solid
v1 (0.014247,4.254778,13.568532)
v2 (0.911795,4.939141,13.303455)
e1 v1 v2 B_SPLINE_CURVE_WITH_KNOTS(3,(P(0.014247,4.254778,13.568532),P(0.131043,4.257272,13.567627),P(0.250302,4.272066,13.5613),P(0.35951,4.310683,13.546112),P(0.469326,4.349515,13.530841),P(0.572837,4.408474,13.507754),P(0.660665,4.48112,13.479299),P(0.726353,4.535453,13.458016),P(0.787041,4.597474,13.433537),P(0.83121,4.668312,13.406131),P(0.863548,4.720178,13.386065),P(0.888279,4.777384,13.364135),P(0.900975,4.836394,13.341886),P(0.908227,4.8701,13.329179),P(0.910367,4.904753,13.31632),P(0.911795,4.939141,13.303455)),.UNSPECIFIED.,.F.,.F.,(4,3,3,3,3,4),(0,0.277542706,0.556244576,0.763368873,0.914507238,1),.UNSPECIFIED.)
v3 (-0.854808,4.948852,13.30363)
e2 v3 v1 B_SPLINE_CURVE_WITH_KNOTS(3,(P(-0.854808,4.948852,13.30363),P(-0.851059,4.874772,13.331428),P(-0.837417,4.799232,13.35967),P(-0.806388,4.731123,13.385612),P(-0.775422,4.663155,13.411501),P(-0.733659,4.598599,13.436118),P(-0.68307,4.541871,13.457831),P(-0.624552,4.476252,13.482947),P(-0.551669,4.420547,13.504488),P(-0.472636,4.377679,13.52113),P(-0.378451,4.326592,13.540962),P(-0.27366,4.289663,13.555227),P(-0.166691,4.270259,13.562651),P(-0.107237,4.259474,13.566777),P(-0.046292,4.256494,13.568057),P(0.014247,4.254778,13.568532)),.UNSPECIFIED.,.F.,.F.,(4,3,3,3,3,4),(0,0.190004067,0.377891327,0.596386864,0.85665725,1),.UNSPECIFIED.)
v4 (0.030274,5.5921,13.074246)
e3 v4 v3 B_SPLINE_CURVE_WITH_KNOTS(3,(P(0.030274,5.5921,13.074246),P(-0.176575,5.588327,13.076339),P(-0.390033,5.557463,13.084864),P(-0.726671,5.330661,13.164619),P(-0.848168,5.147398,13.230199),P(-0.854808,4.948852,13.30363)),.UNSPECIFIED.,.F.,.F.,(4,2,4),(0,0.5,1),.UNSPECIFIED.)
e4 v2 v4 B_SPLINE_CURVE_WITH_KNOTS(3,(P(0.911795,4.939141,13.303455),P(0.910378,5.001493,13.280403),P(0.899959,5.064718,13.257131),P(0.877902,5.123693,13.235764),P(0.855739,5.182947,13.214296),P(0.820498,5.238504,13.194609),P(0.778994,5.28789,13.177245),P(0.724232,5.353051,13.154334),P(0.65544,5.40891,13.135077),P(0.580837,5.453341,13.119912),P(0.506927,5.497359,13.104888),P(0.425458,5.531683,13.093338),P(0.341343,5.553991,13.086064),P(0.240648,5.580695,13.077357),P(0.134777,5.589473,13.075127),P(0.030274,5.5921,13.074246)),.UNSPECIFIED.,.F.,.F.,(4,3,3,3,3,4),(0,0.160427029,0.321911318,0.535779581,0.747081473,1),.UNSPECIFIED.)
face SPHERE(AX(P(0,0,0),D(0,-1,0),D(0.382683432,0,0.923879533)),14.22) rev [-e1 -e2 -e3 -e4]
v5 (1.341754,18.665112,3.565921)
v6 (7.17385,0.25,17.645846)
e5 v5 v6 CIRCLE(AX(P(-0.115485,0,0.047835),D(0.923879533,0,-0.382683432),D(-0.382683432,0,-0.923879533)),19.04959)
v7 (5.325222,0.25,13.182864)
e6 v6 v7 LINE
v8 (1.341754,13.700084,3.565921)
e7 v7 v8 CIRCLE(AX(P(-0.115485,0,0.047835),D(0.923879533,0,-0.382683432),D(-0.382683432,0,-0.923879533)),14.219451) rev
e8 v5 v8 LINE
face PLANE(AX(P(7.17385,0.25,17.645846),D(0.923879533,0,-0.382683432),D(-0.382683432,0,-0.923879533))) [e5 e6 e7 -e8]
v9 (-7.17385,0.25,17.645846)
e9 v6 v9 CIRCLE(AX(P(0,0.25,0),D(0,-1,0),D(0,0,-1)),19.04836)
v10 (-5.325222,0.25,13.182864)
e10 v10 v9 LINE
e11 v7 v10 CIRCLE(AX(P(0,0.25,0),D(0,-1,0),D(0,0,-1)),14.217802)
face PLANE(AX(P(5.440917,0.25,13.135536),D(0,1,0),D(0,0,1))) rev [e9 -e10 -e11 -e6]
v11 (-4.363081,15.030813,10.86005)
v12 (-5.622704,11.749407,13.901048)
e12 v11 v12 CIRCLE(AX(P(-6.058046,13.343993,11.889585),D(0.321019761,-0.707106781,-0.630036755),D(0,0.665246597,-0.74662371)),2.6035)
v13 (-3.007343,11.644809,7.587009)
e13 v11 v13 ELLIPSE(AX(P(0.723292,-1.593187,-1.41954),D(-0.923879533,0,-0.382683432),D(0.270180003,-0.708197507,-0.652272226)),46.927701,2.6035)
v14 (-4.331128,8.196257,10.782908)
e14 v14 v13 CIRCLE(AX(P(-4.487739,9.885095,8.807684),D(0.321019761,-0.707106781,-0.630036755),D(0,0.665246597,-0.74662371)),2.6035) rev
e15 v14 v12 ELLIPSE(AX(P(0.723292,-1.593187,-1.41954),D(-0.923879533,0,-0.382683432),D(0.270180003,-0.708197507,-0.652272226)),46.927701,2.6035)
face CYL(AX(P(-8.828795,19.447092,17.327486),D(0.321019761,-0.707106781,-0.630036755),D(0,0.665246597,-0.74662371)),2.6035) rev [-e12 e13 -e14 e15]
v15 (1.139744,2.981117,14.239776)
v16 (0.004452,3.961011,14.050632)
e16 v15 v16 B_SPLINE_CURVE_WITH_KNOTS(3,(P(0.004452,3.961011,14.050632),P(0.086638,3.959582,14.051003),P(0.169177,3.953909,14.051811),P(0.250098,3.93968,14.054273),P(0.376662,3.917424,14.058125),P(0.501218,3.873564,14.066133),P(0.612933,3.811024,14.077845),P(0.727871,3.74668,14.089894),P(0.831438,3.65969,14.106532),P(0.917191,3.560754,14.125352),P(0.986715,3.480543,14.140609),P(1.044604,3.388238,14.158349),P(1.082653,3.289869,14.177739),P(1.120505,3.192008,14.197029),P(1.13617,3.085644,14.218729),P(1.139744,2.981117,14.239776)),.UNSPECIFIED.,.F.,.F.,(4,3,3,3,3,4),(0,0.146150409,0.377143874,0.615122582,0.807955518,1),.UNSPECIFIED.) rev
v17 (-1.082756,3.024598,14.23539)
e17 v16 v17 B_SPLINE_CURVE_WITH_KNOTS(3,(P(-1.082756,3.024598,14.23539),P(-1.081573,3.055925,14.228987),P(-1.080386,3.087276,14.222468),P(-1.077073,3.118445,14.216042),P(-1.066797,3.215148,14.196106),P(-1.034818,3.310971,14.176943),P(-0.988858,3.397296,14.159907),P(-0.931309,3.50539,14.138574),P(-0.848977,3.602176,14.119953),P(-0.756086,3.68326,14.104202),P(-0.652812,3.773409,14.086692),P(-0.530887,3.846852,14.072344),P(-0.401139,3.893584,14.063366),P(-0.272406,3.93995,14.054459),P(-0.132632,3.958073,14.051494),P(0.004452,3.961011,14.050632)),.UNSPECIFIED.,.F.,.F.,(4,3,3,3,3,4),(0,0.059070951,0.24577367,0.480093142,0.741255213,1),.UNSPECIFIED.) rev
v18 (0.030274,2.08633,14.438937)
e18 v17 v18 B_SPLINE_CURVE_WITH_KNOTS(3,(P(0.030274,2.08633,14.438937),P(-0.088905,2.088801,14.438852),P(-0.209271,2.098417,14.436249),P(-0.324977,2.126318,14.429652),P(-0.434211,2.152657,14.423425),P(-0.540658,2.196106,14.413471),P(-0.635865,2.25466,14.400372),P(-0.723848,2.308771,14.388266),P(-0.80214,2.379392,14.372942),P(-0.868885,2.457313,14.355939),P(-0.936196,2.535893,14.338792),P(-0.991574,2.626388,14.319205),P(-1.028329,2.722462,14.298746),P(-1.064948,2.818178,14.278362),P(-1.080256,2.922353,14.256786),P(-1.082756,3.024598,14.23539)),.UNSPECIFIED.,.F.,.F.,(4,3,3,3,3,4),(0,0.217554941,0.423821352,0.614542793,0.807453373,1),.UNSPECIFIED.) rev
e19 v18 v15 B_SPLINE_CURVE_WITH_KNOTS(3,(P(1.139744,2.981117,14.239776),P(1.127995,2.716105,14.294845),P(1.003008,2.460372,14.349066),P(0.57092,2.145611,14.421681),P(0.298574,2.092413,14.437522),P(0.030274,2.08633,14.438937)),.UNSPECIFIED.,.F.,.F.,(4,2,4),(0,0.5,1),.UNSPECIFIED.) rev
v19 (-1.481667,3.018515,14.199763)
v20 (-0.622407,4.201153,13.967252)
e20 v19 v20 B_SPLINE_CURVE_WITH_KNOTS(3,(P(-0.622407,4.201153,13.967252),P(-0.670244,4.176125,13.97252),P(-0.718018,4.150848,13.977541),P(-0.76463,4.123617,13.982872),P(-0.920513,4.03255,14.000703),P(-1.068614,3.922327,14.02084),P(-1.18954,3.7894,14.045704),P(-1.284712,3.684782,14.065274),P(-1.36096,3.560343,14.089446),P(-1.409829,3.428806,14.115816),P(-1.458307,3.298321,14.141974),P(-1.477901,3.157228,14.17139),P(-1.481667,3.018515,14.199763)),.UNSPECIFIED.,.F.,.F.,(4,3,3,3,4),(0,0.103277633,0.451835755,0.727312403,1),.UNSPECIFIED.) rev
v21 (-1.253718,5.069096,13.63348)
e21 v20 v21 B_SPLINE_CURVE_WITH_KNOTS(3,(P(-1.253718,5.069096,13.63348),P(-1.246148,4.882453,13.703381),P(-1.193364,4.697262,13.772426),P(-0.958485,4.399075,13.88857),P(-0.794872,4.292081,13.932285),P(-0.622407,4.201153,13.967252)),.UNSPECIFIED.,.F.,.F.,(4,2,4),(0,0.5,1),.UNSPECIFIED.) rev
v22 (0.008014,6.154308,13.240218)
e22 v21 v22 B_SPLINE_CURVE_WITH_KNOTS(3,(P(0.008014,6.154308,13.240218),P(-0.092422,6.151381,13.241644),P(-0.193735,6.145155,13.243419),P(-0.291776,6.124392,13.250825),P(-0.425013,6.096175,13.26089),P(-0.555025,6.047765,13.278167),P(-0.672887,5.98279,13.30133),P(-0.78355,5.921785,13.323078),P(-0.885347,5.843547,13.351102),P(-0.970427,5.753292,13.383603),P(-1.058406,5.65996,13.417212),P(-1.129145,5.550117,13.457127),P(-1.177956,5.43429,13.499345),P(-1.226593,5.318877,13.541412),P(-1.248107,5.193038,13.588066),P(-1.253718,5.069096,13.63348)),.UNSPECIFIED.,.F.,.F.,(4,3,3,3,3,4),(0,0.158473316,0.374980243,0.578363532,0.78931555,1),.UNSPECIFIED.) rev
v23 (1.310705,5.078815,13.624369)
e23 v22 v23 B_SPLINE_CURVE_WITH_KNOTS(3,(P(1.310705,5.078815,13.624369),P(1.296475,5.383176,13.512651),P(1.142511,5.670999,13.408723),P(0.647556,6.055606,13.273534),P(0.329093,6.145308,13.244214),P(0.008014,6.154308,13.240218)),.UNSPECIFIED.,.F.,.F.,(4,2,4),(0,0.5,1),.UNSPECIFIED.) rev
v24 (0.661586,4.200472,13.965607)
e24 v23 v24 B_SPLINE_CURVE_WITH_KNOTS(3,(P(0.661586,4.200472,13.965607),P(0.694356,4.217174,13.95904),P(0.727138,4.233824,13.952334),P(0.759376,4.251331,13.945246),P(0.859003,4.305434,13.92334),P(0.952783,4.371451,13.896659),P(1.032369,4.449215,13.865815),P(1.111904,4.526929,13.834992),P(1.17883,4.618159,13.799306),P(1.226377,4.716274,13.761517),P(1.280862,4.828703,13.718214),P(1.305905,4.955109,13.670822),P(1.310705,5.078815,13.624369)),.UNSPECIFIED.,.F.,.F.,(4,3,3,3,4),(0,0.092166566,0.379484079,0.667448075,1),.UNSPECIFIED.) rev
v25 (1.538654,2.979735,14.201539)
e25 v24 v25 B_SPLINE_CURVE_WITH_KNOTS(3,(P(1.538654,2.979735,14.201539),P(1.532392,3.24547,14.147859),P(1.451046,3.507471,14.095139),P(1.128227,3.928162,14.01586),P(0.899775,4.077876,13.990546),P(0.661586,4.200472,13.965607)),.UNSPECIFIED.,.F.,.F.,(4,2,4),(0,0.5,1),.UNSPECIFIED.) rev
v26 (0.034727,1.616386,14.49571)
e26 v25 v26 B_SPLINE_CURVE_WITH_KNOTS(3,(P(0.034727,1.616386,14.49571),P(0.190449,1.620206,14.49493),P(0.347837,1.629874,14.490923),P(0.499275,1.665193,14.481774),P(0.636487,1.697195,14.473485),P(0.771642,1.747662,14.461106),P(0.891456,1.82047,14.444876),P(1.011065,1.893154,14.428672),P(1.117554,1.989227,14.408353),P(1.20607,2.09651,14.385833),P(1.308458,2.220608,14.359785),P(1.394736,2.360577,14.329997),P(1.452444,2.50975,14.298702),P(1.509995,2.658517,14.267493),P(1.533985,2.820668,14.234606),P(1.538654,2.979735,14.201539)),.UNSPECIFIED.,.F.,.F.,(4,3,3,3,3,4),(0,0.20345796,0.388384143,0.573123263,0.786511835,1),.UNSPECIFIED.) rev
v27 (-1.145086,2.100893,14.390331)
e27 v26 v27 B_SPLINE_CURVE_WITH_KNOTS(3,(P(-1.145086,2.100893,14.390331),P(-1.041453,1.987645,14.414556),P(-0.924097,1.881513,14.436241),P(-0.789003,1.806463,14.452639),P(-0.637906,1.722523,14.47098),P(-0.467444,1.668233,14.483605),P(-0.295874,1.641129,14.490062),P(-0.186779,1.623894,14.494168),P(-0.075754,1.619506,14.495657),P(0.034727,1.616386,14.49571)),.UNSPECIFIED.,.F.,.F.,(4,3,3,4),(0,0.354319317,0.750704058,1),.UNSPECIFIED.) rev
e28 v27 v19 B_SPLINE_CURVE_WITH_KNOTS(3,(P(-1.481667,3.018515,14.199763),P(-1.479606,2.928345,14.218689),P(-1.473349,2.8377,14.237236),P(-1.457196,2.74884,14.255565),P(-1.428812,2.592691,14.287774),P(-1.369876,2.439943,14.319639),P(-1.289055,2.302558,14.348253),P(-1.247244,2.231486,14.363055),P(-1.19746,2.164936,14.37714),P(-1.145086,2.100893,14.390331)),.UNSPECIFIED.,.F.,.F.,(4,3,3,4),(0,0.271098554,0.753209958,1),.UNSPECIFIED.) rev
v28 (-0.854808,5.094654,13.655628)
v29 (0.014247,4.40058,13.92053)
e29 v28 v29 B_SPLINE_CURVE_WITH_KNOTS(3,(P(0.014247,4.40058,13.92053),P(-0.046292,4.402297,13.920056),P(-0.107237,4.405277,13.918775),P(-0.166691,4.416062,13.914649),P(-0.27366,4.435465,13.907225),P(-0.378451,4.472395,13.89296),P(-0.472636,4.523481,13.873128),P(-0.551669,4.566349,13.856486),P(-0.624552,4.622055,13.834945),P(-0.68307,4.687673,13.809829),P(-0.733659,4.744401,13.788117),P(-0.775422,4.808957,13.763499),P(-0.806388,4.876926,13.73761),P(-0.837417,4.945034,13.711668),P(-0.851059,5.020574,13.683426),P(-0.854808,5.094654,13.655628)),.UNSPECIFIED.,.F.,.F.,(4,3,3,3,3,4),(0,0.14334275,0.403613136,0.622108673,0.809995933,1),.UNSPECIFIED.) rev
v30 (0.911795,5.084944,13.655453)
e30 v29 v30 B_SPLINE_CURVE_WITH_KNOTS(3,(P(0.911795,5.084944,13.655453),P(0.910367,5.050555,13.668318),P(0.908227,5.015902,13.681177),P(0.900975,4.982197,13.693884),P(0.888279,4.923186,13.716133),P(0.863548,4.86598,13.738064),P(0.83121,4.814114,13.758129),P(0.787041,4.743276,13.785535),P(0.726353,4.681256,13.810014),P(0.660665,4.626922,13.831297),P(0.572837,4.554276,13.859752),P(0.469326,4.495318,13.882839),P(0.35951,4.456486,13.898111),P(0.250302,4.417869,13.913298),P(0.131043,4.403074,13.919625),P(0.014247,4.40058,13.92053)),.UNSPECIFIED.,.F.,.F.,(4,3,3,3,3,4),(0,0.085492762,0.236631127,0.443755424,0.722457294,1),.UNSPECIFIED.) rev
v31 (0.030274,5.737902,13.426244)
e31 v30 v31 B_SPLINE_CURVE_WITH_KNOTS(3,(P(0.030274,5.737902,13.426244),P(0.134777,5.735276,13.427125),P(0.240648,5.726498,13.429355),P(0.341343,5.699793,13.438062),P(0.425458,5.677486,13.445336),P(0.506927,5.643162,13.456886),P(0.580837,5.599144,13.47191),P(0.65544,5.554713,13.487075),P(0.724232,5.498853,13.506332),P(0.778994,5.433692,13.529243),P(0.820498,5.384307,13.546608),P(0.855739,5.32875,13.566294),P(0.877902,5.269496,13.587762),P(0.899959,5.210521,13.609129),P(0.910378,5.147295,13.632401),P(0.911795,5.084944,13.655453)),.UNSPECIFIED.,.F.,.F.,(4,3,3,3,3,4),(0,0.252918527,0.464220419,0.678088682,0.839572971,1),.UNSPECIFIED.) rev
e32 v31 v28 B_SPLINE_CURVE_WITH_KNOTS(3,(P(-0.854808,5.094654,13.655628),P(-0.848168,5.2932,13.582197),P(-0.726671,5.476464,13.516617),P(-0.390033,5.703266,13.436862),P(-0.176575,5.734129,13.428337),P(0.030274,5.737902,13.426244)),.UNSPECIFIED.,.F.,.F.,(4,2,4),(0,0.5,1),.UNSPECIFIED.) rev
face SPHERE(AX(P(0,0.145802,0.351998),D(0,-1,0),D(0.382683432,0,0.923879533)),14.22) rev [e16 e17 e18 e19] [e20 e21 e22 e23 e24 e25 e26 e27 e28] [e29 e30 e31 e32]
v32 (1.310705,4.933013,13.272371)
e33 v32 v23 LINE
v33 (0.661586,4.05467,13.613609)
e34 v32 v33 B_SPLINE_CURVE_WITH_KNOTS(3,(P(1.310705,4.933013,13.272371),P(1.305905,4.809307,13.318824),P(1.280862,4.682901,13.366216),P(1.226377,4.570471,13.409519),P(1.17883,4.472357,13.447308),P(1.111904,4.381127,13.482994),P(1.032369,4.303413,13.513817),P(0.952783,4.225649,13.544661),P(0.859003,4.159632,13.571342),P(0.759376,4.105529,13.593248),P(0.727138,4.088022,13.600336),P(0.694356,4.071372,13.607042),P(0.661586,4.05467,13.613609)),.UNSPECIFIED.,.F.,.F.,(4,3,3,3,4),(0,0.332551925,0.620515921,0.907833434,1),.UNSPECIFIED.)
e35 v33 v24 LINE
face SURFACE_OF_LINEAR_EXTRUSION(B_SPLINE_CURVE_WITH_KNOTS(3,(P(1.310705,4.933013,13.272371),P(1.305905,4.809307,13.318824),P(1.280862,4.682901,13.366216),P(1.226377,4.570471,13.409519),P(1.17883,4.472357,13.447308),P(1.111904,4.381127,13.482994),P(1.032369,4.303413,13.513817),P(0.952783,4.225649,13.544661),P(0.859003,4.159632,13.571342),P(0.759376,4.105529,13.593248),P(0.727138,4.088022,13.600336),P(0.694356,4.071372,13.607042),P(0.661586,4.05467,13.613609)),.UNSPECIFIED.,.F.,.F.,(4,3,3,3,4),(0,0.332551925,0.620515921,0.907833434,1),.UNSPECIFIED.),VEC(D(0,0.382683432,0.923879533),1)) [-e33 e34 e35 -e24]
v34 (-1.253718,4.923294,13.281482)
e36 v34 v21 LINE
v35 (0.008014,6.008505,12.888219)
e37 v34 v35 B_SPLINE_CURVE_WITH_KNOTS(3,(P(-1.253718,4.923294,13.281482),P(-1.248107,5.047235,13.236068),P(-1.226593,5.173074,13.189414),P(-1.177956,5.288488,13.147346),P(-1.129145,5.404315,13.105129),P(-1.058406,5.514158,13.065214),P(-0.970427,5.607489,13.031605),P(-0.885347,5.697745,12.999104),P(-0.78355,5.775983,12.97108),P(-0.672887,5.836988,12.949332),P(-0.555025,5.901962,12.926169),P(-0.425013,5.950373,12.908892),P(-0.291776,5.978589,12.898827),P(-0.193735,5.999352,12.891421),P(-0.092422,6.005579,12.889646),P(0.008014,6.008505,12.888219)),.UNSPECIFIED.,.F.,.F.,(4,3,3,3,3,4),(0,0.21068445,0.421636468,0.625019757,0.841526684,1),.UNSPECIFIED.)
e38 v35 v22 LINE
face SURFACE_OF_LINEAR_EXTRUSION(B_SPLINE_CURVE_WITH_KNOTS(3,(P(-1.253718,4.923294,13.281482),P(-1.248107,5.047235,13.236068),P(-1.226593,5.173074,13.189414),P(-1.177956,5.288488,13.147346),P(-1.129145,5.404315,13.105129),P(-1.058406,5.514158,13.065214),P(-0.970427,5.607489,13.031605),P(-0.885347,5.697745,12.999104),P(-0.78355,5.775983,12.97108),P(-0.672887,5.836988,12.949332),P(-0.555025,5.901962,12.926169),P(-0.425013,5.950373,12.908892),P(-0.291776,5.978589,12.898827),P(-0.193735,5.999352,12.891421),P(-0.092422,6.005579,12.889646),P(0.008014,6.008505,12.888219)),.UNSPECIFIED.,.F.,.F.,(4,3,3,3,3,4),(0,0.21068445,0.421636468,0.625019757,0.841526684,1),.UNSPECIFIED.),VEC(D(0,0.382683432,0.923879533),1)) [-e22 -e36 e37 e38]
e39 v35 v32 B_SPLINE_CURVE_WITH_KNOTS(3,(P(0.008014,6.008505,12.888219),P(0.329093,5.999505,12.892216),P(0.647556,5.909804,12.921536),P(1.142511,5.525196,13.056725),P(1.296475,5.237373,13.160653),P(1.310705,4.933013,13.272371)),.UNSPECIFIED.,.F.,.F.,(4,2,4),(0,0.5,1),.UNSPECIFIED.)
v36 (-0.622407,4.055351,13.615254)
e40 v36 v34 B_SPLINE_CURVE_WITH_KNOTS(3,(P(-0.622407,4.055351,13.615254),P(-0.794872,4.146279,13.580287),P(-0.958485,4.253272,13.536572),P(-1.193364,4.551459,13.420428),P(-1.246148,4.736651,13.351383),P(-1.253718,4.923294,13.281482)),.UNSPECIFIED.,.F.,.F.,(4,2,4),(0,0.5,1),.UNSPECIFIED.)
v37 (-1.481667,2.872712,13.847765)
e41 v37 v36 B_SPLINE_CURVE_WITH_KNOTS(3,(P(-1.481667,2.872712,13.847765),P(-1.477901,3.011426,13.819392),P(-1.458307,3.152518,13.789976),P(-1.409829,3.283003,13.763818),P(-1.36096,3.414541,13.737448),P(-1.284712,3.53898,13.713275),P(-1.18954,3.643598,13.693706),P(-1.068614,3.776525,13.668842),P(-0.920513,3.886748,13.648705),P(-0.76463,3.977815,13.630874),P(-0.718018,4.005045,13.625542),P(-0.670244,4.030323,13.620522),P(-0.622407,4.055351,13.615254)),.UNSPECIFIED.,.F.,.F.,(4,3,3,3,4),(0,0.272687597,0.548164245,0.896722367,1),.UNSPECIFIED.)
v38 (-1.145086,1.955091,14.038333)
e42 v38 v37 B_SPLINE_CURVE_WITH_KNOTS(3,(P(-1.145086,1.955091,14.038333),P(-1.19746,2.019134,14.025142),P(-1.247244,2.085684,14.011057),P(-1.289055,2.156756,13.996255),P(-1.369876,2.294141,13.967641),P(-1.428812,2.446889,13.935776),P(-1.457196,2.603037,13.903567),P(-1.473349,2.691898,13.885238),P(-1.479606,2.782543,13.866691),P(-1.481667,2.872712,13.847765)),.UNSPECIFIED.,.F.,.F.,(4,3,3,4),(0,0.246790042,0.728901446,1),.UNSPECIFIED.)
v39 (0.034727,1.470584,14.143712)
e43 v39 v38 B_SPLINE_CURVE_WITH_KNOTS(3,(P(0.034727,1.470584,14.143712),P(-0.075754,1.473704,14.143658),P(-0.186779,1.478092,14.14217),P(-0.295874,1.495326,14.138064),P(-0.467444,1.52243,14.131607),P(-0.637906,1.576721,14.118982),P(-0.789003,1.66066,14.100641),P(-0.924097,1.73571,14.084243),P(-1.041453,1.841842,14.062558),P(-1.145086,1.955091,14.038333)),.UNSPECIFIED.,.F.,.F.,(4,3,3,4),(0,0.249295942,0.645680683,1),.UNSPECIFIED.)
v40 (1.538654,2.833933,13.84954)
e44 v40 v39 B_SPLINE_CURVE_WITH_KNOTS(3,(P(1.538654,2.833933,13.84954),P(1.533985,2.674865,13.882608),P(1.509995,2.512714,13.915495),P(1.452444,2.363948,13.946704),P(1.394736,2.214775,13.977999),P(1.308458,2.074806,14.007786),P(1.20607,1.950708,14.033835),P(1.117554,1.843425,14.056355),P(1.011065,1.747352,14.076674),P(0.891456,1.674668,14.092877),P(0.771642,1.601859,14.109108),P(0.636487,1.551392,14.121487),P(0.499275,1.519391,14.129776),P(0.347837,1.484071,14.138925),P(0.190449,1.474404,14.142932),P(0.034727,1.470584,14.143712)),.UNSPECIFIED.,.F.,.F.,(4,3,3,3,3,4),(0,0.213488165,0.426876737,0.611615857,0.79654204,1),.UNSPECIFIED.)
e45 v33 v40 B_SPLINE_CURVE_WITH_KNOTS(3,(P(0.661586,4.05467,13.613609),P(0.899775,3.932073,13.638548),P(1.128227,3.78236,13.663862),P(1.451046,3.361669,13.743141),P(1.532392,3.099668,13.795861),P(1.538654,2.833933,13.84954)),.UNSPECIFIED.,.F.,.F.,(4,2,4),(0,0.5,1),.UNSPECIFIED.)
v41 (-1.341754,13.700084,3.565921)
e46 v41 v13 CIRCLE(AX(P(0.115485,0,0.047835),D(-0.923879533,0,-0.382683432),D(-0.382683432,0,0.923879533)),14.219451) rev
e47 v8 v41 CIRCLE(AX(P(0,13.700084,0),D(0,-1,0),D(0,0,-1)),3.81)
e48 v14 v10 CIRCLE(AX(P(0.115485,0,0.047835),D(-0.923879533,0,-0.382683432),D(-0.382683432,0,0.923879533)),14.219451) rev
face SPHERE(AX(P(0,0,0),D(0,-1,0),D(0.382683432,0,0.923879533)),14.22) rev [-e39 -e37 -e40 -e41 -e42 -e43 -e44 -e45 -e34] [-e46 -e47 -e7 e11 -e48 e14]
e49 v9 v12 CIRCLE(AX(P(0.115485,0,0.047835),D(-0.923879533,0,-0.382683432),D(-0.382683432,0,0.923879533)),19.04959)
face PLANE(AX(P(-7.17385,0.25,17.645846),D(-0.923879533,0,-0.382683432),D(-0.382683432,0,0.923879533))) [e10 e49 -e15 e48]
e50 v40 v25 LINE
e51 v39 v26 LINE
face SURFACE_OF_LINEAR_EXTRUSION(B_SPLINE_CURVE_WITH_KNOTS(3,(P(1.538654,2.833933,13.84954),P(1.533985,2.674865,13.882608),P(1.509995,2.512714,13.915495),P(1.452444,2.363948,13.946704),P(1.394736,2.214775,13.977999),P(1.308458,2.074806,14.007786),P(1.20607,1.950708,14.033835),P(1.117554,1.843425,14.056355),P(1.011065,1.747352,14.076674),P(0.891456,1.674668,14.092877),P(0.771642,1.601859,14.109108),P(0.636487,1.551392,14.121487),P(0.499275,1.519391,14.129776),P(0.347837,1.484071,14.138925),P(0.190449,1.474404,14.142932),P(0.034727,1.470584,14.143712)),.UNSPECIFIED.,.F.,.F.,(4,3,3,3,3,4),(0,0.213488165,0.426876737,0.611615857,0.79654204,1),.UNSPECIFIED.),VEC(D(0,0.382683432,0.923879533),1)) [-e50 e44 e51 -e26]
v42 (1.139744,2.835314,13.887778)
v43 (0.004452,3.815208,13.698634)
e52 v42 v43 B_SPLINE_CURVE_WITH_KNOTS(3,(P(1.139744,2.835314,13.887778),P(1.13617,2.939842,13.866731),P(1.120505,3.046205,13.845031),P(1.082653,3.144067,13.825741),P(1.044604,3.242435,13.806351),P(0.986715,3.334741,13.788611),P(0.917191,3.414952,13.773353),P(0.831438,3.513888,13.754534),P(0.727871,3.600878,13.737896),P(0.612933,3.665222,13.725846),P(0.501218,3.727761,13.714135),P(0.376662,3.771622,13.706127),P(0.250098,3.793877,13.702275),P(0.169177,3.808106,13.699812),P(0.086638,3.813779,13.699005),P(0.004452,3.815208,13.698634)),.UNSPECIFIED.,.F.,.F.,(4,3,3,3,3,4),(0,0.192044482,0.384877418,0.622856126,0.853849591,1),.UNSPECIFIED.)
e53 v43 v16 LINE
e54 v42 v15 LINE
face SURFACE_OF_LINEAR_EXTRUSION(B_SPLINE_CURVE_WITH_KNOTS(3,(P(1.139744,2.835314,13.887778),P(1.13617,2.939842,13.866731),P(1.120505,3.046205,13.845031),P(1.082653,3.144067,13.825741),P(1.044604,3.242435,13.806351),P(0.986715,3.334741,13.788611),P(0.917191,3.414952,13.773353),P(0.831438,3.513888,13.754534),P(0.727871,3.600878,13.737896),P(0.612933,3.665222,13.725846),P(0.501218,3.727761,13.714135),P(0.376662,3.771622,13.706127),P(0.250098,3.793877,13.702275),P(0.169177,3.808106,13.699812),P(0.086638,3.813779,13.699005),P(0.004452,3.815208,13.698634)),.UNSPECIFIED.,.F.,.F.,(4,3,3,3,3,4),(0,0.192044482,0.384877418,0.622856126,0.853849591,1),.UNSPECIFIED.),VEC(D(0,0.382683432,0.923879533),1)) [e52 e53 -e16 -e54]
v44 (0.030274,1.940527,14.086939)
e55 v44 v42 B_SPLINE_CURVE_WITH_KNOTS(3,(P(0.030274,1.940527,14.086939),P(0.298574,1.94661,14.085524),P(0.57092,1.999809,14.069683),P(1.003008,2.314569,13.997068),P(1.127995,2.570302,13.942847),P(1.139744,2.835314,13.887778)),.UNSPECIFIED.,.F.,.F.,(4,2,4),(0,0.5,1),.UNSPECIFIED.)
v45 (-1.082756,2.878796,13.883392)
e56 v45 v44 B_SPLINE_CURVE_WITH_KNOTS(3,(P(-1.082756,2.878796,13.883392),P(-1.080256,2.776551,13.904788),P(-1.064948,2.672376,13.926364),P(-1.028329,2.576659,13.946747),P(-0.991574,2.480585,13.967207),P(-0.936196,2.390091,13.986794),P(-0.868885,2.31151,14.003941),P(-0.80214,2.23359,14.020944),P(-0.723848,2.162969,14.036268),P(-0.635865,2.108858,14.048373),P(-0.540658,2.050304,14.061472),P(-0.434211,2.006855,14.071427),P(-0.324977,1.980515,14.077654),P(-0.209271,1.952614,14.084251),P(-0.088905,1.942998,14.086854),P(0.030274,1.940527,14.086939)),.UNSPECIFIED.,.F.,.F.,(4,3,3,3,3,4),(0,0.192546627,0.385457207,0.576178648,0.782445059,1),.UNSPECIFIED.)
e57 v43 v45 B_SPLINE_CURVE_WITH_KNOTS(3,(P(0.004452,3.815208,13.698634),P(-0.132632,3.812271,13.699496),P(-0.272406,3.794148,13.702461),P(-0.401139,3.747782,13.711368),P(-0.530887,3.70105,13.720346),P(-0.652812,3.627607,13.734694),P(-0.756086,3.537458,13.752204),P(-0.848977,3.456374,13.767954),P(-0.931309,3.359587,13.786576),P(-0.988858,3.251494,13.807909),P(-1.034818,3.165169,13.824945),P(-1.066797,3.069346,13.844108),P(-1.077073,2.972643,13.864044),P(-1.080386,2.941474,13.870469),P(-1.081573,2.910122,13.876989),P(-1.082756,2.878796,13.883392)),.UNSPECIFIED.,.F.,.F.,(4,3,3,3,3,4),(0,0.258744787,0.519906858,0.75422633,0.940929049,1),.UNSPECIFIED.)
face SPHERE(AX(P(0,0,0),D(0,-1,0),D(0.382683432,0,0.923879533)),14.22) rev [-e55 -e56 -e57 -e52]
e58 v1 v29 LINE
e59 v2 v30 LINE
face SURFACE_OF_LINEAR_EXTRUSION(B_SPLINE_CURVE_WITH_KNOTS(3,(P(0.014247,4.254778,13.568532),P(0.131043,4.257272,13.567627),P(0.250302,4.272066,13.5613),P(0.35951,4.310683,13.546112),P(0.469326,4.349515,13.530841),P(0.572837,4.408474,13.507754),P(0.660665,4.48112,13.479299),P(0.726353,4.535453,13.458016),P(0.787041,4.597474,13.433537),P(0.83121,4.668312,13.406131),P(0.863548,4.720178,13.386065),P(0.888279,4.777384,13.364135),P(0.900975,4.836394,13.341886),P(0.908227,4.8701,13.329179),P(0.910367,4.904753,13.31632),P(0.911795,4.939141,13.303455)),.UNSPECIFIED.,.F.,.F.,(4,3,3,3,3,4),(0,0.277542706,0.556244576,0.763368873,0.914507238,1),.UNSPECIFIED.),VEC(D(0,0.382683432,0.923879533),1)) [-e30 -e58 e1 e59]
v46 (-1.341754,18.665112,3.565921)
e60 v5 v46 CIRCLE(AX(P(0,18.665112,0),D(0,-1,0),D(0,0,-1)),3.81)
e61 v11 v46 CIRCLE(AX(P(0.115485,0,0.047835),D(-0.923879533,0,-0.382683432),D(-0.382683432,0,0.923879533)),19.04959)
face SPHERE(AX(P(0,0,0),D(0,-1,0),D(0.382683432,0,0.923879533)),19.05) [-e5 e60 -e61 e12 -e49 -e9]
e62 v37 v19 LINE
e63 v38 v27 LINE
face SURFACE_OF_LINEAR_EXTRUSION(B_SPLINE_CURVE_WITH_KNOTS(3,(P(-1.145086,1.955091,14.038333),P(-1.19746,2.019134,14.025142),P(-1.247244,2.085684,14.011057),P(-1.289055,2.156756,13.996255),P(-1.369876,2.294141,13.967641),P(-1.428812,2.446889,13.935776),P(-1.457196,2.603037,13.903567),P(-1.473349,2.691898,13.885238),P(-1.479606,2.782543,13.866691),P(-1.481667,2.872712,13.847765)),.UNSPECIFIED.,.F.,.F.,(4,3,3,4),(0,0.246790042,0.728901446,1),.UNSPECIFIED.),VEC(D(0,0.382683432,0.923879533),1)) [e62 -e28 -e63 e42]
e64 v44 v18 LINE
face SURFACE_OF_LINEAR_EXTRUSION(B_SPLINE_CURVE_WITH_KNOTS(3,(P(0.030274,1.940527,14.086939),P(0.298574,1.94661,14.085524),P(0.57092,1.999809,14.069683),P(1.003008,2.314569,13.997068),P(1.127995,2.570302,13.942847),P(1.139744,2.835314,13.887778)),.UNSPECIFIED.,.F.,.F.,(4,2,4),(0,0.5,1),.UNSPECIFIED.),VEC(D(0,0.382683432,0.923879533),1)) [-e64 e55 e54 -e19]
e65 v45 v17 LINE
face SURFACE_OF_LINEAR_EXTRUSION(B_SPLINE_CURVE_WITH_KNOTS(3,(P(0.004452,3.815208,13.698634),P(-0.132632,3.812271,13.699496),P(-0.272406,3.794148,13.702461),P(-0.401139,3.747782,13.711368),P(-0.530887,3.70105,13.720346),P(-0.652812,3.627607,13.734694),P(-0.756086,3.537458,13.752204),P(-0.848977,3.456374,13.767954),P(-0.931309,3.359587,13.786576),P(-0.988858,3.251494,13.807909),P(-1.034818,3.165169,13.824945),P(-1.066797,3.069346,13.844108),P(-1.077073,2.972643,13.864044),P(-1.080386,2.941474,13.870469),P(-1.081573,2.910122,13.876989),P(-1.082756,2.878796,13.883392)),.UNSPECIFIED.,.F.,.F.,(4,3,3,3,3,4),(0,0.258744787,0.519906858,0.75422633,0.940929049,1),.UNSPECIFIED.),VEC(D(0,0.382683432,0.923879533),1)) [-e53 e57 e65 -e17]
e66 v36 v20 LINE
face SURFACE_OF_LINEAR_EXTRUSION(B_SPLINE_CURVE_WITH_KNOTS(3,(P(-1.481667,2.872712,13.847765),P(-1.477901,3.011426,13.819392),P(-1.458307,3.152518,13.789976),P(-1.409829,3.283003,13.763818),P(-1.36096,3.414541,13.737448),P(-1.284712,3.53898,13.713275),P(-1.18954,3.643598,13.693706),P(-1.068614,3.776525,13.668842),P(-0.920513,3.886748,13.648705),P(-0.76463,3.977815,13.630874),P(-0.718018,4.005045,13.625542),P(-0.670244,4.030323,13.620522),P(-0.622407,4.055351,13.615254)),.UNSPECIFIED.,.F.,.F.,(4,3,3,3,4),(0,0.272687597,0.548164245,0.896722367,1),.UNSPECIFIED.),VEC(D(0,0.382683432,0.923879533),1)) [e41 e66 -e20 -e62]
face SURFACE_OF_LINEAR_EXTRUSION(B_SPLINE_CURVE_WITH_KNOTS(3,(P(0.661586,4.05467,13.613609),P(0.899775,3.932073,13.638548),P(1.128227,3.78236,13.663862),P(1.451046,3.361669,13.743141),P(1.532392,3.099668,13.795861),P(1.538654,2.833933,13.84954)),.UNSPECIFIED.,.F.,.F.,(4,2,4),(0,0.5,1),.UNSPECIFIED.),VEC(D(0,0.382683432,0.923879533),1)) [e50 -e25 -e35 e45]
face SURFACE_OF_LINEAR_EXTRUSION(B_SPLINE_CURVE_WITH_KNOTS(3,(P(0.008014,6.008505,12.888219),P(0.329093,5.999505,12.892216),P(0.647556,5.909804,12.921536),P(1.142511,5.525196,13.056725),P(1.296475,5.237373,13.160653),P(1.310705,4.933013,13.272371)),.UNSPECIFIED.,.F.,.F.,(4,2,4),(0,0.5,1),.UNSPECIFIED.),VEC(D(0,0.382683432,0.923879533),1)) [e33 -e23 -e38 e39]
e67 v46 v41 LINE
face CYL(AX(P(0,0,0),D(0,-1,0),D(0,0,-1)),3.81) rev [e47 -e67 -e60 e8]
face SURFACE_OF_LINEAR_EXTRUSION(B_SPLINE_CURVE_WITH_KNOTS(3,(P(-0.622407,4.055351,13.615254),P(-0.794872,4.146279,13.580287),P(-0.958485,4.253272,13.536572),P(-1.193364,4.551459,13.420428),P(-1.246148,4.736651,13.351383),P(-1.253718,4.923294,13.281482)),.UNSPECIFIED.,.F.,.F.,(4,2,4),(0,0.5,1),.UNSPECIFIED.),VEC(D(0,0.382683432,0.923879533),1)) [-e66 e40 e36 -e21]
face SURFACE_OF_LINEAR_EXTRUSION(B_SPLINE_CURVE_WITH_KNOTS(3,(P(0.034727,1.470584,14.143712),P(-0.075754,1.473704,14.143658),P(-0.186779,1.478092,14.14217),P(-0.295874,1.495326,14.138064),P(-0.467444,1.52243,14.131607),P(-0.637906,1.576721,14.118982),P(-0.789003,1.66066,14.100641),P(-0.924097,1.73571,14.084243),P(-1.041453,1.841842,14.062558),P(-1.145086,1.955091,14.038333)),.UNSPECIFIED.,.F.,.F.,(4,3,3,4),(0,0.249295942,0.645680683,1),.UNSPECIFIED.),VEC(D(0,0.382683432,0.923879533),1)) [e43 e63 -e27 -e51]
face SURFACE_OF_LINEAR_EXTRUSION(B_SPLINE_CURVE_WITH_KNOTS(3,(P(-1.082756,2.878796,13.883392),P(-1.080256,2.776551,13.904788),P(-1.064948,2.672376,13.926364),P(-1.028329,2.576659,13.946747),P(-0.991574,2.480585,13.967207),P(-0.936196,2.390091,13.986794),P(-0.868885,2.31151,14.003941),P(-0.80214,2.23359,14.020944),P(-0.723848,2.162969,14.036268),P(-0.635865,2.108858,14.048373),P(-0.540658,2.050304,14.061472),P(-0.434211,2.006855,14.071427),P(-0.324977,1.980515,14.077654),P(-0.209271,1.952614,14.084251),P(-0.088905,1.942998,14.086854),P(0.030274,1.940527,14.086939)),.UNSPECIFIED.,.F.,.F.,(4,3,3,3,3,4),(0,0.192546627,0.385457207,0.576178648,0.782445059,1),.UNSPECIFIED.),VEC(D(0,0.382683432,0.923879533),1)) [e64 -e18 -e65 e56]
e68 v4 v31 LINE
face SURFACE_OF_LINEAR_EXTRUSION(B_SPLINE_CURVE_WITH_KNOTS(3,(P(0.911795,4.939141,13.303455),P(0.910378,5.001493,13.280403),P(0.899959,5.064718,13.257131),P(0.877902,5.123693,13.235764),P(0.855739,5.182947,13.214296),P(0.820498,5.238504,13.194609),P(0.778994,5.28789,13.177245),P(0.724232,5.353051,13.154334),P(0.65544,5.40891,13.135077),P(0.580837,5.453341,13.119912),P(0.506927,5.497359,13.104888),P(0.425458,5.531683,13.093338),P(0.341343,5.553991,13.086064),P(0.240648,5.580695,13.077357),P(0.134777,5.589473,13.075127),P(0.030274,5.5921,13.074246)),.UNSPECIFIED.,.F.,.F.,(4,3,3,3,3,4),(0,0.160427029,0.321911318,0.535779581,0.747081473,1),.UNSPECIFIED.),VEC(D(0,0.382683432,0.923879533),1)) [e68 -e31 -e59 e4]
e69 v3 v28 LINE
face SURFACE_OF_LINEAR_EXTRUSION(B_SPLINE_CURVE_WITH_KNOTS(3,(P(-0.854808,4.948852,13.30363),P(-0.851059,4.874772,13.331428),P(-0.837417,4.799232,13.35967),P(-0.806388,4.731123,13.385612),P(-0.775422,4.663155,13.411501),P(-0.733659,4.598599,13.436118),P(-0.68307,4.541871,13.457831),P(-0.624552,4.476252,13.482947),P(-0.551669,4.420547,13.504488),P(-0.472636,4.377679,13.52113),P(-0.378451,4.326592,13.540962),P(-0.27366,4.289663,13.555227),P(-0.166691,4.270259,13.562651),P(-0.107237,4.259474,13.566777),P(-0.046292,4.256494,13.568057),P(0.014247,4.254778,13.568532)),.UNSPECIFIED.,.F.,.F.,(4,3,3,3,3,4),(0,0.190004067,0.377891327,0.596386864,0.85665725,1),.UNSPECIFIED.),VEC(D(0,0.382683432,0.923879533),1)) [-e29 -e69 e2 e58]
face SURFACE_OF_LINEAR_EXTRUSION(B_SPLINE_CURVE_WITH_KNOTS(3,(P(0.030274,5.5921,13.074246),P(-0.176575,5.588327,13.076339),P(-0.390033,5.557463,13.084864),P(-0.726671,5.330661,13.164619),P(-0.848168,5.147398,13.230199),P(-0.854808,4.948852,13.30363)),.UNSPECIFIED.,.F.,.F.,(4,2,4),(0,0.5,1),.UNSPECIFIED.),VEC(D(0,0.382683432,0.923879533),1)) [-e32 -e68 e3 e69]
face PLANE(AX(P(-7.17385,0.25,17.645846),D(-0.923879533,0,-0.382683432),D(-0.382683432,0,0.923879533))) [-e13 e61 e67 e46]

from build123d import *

# Parameters (mm, degrees)
REVOLVE1_ANGLE          = 45
CUT_EXTRUDE1_DEPTH      = 28.647117169
CUT_EXTRUDE1_DEPTH_BACK = 28.647117169
CUT_EXTRUDE4_START      = 8.537277035
CUT_EXTRUDE4_DEPTH      = 5.473576564
CUT_EXTRUDE4_START_2    = 14.010853599
CUT_EXTRUDE4_2_DEPTH    = 0.589178544
CUT_EXTRUDE5_DEPTH      = 28.732730484
CUT_EXTRUDE5_DEPTH_BACK = 28.732730484
SKETCH9_R               = 2.6035


with BuildPart() as part:
    # Sketch1 → Revolve1 (revolve, symmetric)
    with BuildSketch(Plane(origin=(0, 0, 0), x_dir=(0, 0, -1), z_dir=(1, 0, 0))) as revolve1_sk:
        with BuildLine():
            Line((-14.217802221, 0.25), (-19.048359509, 0.25))
            ThreePointArc((-19.048359509, 0.25), (-14.676690222, 12.144845166), (-3.81, 18.66511184))
            Line((-3.81, 18.66511184), (-3.81, 13.700083941))
            ThreePointArc((-3.81, 13.700083941), (-11.246181696, 8.70240181), (-14.217802221, 0.25))
        make_face()
    revolve(axis=Axis((0, 0, 0), (0, 1, 0)), revolution_arc=REVOLVE1_ANGLE / 2)
    revolve(revolve1_sk.sketch, axis=Axis((0, 0, 0), (0, -1, 0)), revolution_arc=REVOLVE1_ANGLE / 2)

    # Sketch2 → Cut-Extrude1 (cut, two sides: drawn at the far end of the back side and taken through both)
    with BuildSketch(Plane(origin=(0, 0, 0), x_dir=(1, 0, 0), z_dir=(0, 1, 0)).offset(-CUT_EXTRUDE1_DEPTH_BACK)):
        with BuildLine():
            Line((7.289491598, -17.598389479), (1.458023877, -3.519981019))
            ThreePointArc((1.458023877, -3.519981019), (1.400077392, -3.543428184), (1.341754023, -3.5659215))
            Line((1.341754023, -3.5659215), (7.173849701, -17.645845983))
            ThreePointArc((7.173849701, -17.645845983), (7.231709577, -17.622212591), (7.289491598, -17.598389479))
        make_face()
        with BuildLine():
            Line((-7.173849701, -17.645845983), (-1.341754023, -3.5659215))
            ThreePointArc((-1.341754023, -3.5659215), (-1.400077392, -3.543428184), (-1.458023877, -3.519981019))
            Line((-1.458023877, -3.519981019), (-7.289491598, -17.598389479))
            ThreePointArc((-7.289491598, -17.598389479), (-7.231709577, -17.622212591), (-7.173849701, -17.645845983))
        make_face()
    extrude(amount=CUT_EXTRUDE1_DEPTH + CUT_EXTRUDE1_DEPTH_BACK, mode=Mode.SUBTRACT)

    # Cut-Extrude4: read off the stored shape, not the designer's step
    # Cut-Extrude4 outline → Cut-Extrude4 (cut)
    with BuildSketch(Plane(origin=(0, 0, 0), x_dir=(-1, 0, 0), z_dir=(0, 0.3826834323650899, 0.9238795325112868)).offset(CUT_EXTRUDE4_START)):
        with BuildLine():
            add(Edge.make_bspline(
                [(1.145086138, 3.565969106), (1.19745992, 3.501753358), (1.247244242, 3.434878944), (1.289054738, 3.363552137), (1.36987604, 3.225674665), (1.42881214, 3.072360327), (1.457196317, 2.91577175), (1.47334903, 2.826661179), (1.4796055, 2.735818699), (1.481666667, 2.645269988)],
                knots=[0, 0, 0, 0, 0.246790042, 0.246790042, 0.246790042, 0.728901446, 0.728901446, 0.728901446, 1, 1, 1, 1], degree=3))
            add(Edge.make_bspline(
                [(-0.034726562, 4.053921831), (0.07575388, 4.051019144), (0.186778995, 4.046395579), (0.295874255, 4.028901651), (0.467443739, 4.001389693), (0.637906375, 3.946400478), (0.789002935, 3.861831747), (0.924097327, 3.786219427), (1.04145298, 3.67986749), (1.145086138, 3.565969106)],
                knots=[0, 0, 0, 0, 0.249295942, 0.249295942, 0.249295942, 0.645680683, 0.645680683, 0.645680683, 1, 1, 1, 1], degree=3))
            add(Edge.make_bspline(
                [(-1.538653846, 2.681777399), (-1.533984641, 2.841390676), (-1.509995079, 3.003784016), (-1.452444081, 3.153169647), (-1.394735889, 3.302963304), (-1.308458263, 3.44367736), (-1.206069907, 3.568297055), (-1.117554458, 3.676031652), (-1.011064819, 3.772567587), (-0.891455892, 3.845919508), (-0.771642392, 3.919396885), (-0.636486792, 3.970759294), (-0.499275438, 4.003497061), (-0.34783736, 4.039629235), (-0.190448958, 4.050094147), (-0.034726562, 4.053921831)],
                knots=[0, 0, 0, 0, 0.213488165, 0.213488165, 0.213488165, 0.426876737, 0.426876737, 0.426876737, 0.611615857, 0.611615857, 0.611615857, 0.79654204, 0.79654204, 0.79654204, 1, 1, 1, 1], degree=3))
            add(Edge.make_bspline(
                [(-0.661585537, 1.463676438), (-0.899774904, 1.586484198), (-1.128226559, 1.734488753), (-1.451046171, 2.153494958), (-1.532392107, 2.415727364), (-1.538653846, 2.681777399)],
                knots=[0, 0, 0, 0, 0.5, 0.5, 1, 1, 1, 1], degree=3))
            add(Edge.make_bspline(
                [(-1.310705128, 0.521607127), (-1.305904516, 0.65367332), (-1.280862157, 0.788593254), (-1.226377368, 0.909035745), (-1.178829711, 1.014143213), (-1.111903507, 1.112084922), (-1.032368876, 1.195678848), (-0.952782866, 1.279326774), (-0.859002662, 1.350529079), (-0.759375758, 1.408896603), (-0.727137868, 1.427783528), (-0.694356407, 1.445732495), (-0.661585537, 1.463676438)],
                knots=[0, 0, 0, 0, 0.332551925, 0.332551925, 0.332551925, 0.620515921, 0.620515921, 0.620515921, 0.907833434, 0.907833434, 0.907833434, 1, 1, 1, 1], degree=3))
            add(Edge.make_bspline(
                [(-0.008013822, -0.619026887), (-0.329093033, -0.609182757), (-0.647556074, -0.51508889), (-1.142511109, -0.108023215), (-1.296474915, 0.197661831), (-1.310705128, 0.521607127)],
                knots=[0, 0, 0, 0, 0.5, 0.5, 1, 1, 1, 1], degree=3))
            add(Edge.make_bspline(
                [(1.253717949, 0.534073073), (1.248106847, 0.402186726), (1.226592659, 0.268072734), (1.177956097, 0.145346109), (1.129145328, 0.022179899), (1.058406248, -0.094576574), (0.970426594, -0.19366506), (0.885346609, -0.289487746), (0.783549843, -0.372494682), (0.672886827, -0.437179025), (0.555024512, -0.506071477), (0.425013252, -0.557408464), (0.291775846, -0.587329089), (0.19373517, -0.609345716), (0.092421842, -0.615777022), (-0.008013822, -0.619026887)],
                knots=[0, 0, 0, 0, 0.21068445, 0.21068445, 0.21068445, 0.421636468, 0.421636468, 0.421636468, 0.625019757, 0.625019757, 0.625019757, 0.841526684, 0.841526684, 0.841526684, 1, 1, 1, 1], degree=3))
            add(Edge.make_bspline(
                [(0.622406851, 1.463676438), (0.794872438, 1.366288738), (0.958485385, 1.250710522), (1.193364369, 0.930775301), (1.246147584, 0.733258349), (1.253717949, 0.534073073)],
                knots=[0, 0, 0, 0, 0.5, 0.5, 1, 1, 1, 1], degree=3))
            add(Edge.make_bspline(
                [(1.481666667, 2.645269988), (1.477900568, 2.506257325), (1.458307011, 2.364648218), (1.409828968, 2.234085494), (1.360959813, 2.102469417), (1.284712252, 1.978252529), (1.189539786, 1.874109185), (1.068614249, 1.741785305), (0.920513154, 1.632246696), (0.764629517, 1.541288113), (0.718017874, 1.514090075), (0.670244168, 1.488815415), (0.622406851, 1.463676438)],
                knots=[0, 0, 0, 0, 0.272687597, 0.272687597, 0.272687597, 0.548164245, 0.548164245, 0.548164245, 0.896722367, 0.896722367, 0.896722367, 1, 1, 1, 1], degree=3))
        make_face()
        with BuildLine():
            add(Edge.make_bspline(
                [(-0.030274439, -0.163129452), (0.176574569, -0.158842716), (0.390032776, -0.127065887), (0.726671431, 0.112992678), (0.84816771, 0.307402482), (0.854807692, 0.518935853)],
                knots=[0, 0, 0, 0, 0.5, 0.5, 1, 1, 1, 1], degree=3))
            add(Edge.make_bspline(
                [(-0.911794872, 0.5278401), (-0.910378196, 0.461413058), (-0.899959463, 0.394094746), (-0.877901666, 0.331432281), (-0.855739467, 0.268473225), (-0.820498486, 0.209611521), (-0.778994043, 0.157340082), (-0.724231937, 0.088371705), (-0.655439967, 0.02939478), (-0.580836785, -0.017457561), (-0.506927182, -0.063874318), (-0.425458077, -0.100005398), (-0.341342733, -0.123398581), (-0.240648007, -0.151402628), (-0.134776636, -0.160365623), (-0.030274439, -0.163129452)],
                knots=[0, 0, 0, 0, 0.160427029, 0.160427029, 0.160427029, 0.321911318, 0.321911318, 0.321911318, 0.535779581, 0.535779581, 0.535779581, 0.747081473, 0.747081473, 0.747081473, 1, 1, 1, 1], degree=3))
            add(Edge.make_bspline(
                [(-0.014246795, 1.261550036), (-0.131042531, 1.258899944), (-0.250301822, 1.242809941), (-0.35950973, 1.201320714), (-0.46932602, 1.159600356), (-0.572837351, 1.096294942), (-0.660664627, 1.018289451), (-0.726352616, 0.959947394), (-0.78704119, 0.893280481), (-0.831209505, 0.817346662), (-0.8635483, 0.761750061), (-0.888278804, 0.700506224), (-0.900975083, 0.637472986), (-0.908226779, 0.601470474), (-0.910366848, 0.564534058), (-0.911794872, 0.5278401)],
                knots=[0, 0, 0, 0, 0.277542706, 0.277542706, 0.277542706, 0.556244576, 0.556244576, 0.556244576, 0.763368873, 0.763368873, 0.763368873, 0.914507238, 0.914507238, 0.914507238, 1, 1, 1, 1], degree=3))
            add(Edge.make_bspline(
                [(0.854807692, 0.518935853), (0.851059403, 0.598014432), (0.837417497, 0.678612401), (0.806387963, 0.751464013), (0.775422194, 0.824165914), (0.7336594, 0.89322838), (0.683069938, 0.953947492), (0.624552137, 1.024182453), (0.551669227, 1.083890883), (0.472635772, 1.129864493), (0.378451012, 1.18465159), (0.273659741, 1.22422906), (0.166691144, 1.244996806), (0.107237369, 1.256539642), (0.046291764, 1.259782899), (-0.014246795, 1.261550036)],
                knots=[0, 0, 0, 0, 0.190004067, 0.190004067, 0.190004067, 0.377891327, 0.377891327, 0.377891327, 0.596386864, 0.596386864, 0.596386864, 0.85665725, 0.85665725, 0.85665725, 1, 1, 1, 1], degree=3))
        make_face(mode=Mode.SUBTRACT)
        with BuildLine():
            add(Edge.make_bspline(
                [(-0.004452123, 1.717447472), (0.132632023, 1.720491033), (0.272405968, 1.738369237), (0.40113931, 1.784614637), (0.530887425, 1.831224577), (0.652811922, 1.904568261), (0.756086449, 1.994555749), (0.848976601, 2.075494889), (0.931308921, 2.1720404), (0.988858248, 2.280069612), (1.034817886, 2.366343142), (1.066797145, 2.462204933), (1.077073442, 2.559176199), (1.080385662, 2.590431638), (1.081573452, 2.621891168), (1.08275641, 2.65328381)],
                knots=[0, 0, 0, 0, 0.258744787, 0.258744787, 0.258744787, 0.519906858, 0.519906858, 0.519906858, 0.75422633, 0.75422633, 0.75422633, 0.940929049, 0.940929049, 0.940929049, 1, 1, 1, 1], degree=3))
            add(Edge.make_bspline(
                [(-1.13974359, 2.69513377), (-1.136169754, 2.59050849), (-1.120505423, 2.483937307), (-1.082652756, 2.386143186), (-1.044603899, 2.287842196), (-0.98671476, 2.195774251), (-0.917191359, 2.115830308), (-0.83143774, 2.017223475), (-0.727870947, 1.93048768), (-0.61293256, 1.866430444), (-0.501217868, 1.804169832), (-0.376661899, 1.760583309), (-0.250098152, 1.738548265), (-0.169177452, 1.724459783), (-0.086637973, 1.718909751), (-0.004452123, 1.717447472)],
                knots=[0, 0, 0, 0, 0.192044482, 0.192044482, 0.192044482, 0.384877418, 0.384877418, 0.384877418, 0.622856126, 0.622856126, 0.622856126, 0.853849591, 0.853849591, 0.853849591, 1, 1, 1, 1], degree=3))
            add(Edge.make_bspline(
                [(-0.030274439, 3.598024395), (-0.298573697, 3.591863177), (-0.570919773, 3.536651882), (-1.003008436, 3.218062583), (-1.127994918, 2.961046631), (-1.13974359, 2.69513377)],
                knots=[0, 0, 0, 0, 0.5, 0.5, 1, 1, 1, 1], degree=3))
            add(Edge.make_bspline(
                [(1.08275641, 2.65328381), (1.080255845, 2.755933686), (1.064947857, 2.860435386), (1.028329484, 2.956666448), (0.991574424, 3.053256715), (0.936196487, 3.144358219), (0.868885383, 3.223519144), (0.802139825, 3.30201496), (0.723848366, 3.373124744), (0.635864809, 3.427749398), (0.540657955, 3.486858642), (0.434210654, 3.530809684), (0.324977495, 3.557527657), (0.209271231, 3.585828924), (0.088905226, 3.595709256), (-0.030274439, 3.598024395)],
                knots=[0, 0, 0, 0, 0.192546627, 0.192546627, 0.192546627, 0.385457207, 0.385457207, 0.385457207, 0.576178648, 0.576178648, 0.576178648, 0.782445059, 0.782445059, 0.782445059, 1, 1, 1, 1], degree=3))
        make_face(mode=Mode.SUBTRACT)
    extrude(amount=CUT_EXTRUDE4_DEPTH, mode=Mode.SUBTRACT)

    # Cut-Extrude4 2 outline → Cut-Extrude4 2 (cut)
    with BuildSketch(Plane(origin=(0, 0, 0), x_dir=(1, 0, 0), z_dir=(0, 0.38268343236508984, 0.9238795325112867)).offset(CUT_EXTRUDE4_START_2)):
        with BuildLine():
            add(Edge.make_bspline(
                [(-1.145086138, -3.565969106), (-1.19745992, -3.501753358), (-1.247244242, -3.434878944), (-1.289054738, -3.363552137), (-1.36987604, -3.225674665), (-1.42881214, -3.072360327), (-1.457196317, -2.91577175), (-1.47334903, -2.826661179), (-1.4796055, -2.735818699), (-1.481666667, -2.645269988)],
                knots=[0, 0, 0, 0, 0.246790042, 0.246790042, 0.246790042, 0.728901446, 0.728901446, 0.728901446, 1, 1, 1, 1], degree=3))
            add(Edge.make_bspline(
                [(0.034726562, -4.053921831), (-0.07575388, -4.051019144), (-0.186778995, -4.046395579), (-0.295874255, -4.028901651), (-0.467443739, -4.001389693), (-0.637906375, -3.946400478), (-0.789002935, -3.861831747), (-0.924097327, -3.786219427), (-1.04145298, -3.67986749), (-1.145086138, -3.565969106)],
                knots=[0, 0, 0, 0, 0.249295942, 0.249295942, 0.249295942, 0.645680683, 0.645680683, 0.645680683, 1, 1, 1, 1], degree=3))
            add(Edge.make_bspline(
                [(1.538653846, -2.681777399), (1.533984641, -2.841390676), (1.509995079, -3.003784016), (1.452444081, -3.153169647), (1.394735889, -3.302963304), (1.308458263, -3.44367736), (1.206069907, -3.568297055), (1.117554458, -3.676031652), (1.011064819, -3.772567587), (0.891455892, -3.845919508), (0.771642392, -3.919396885), (0.636486792, -3.970759294), (0.499275438, -4.003497061), (0.34783736, -4.039629235), (0.190448958, -4.050094147), (0.034726562, -4.053921831)],
                knots=[0, 0, 0, 0, 0.213488165, 0.213488165, 0.213488165, 0.426876737, 0.426876737, 0.426876737, 0.611615857, 0.611615857, 0.611615857, 0.79654204, 0.79654204, 0.79654204, 1, 1, 1, 1], degree=3))
            add(Edge.make_bspline(
                [(0.661585537, -1.463676438), (0.899774904, -1.586484198), (1.128226559, -1.734488753), (1.451046171, -2.153494958), (1.532392107, -2.415727364), (1.538653846, -2.681777399)],
                knots=[0, 0, 0, 0, 0.5, 0.5, 1, 1, 1, 1], degree=3))
            add(Edge.make_bspline(
                [(1.310705128, -0.521607127), (1.305904516, -0.65367332), (1.280862157, -0.788593254), (1.226377368, -0.909035745), (1.178829711, -1.014143213), (1.111903507, -1.112084922), (1.032368876, -1.195678848), (0.952782866, -1.279326774), (0.859002662, -1.350529079), (0.759375758, -1.408896603), (0.727137868, -1.427783528), (0.694356407, -1.445732495), (0.661585537, -1.463676438)],
                knots=[0, 0, 0, 0, 0.332551925, 0.332551925, 0.332551925, 0.620515921, 0.620515921, 0.620515921, 0.907833434, 0.907833434, 0.907833434, 1, 1, 1, 1], degree=3))
            add(Edge.make_bspline(
                [(0.008013822, 0.619026887), (0.329093033, 0.609182757), (0.647556074, 0.51508889), (1.142511109, 0.108023215), (1.296474915, -0.197661831), (1.310705128, -0.521607127)],
                knots=[0, 0, 0, 0, 0.5, 0.5, 1, 1, 1, 1], degree=3))
            add(Edge.make_bspline(
                [(-1.253717949, -0.534073073), (-1.248106847, -0.402186726), (-1.226592659, -0.268072734), (-1.177956097, -0.145346109), (-1.129145328, -0.022179899), (-1.058406248, 0.094576574), (-0.970426594, 0.19366506), (-0.885346609, 0.289487746), (-0.783549843, 0.372494682), (-0.672886827, 0.437179025), (-0.555024512, 0.506071477), (-0.425013252, 0.557408464), (-0.291775846, 0.587329089), (-0.19373517, 0.609345716), (-0.092421842, 0.615777022), (0.008013822, 0.619026887)],
                knots=[0, 0, 0, 0, 0.21068445, 0.21068445, 0.21068445, 0.421636468, 0.421636468, 0.421636468, 0.625019757, 0.625019757, 0.625019757, 0.841526684, 0.841526684, 0.841526684, 1, 1, 1, 1], degree=3))
            add(Edge.make_bspline(
                [(-0.622406851, -1.463676438), (-0.794872438, -1.366288738), (-0.958485385, -1.250710522), (-1.193364369, -0.930775301), (-1.246147584, -0.733258349), (-1.253717949, -0.534073073)],
                knots=[0, 0, 0, 0, 0.5, 0.5, 1, 1, 1, 1], degree=3))
            add(Edge.make_bspline(
                [(-1.481666667, -2.645269988), (-1.477900568, -2.506257325), (-1.458307011, -2.364648218), (-1.409828968, -2.234085494), (-1.360959813, -2.102469417), (-1.284712252, -1.978252529), (-1.189539786, -1.874109185), (-1.068614249, -1.741785305), (-0.920513154, -1.632246696), (-0.764629517, -1.541288113), (-0.718017874, -1.514090075), (-0.670244168, -1.488815415), (-0.622406851, -1.463676438)],
                knots=[0, 0, 0, 0, 0.272687597, 0.272687597, 0.272687597, 0.548164245, 0.548164245, 0.548164245, 0.896722367, 0.896722367, 0.896722367, 1, 1, 1, 1], degree=3))
        make_face()
        with BuildLine():
            add(Edge.make_bspline(
                [(0.004452123, -1.717447472), (-0.132632023, -1.720491033), (-0.272405968, -1.738369237), (-0.40113931, -1.784614637), (-0.530887425, -1.831224577), (-0.652811922, -1.904568261), (-0.756086449, -1.994555749), (-0.848976601, -2.075494889), (-0.931308921, -2.1720404), (-0.988858248, -2.280069612), (-1.034817886, -2.366343142), (-1.066797145, -2.462204933), (-1.077073442, -2.559176199), (-1.080385662, -2.590431638), (-1.081573452, -2.621891168), (-1.08275641, -2.65328381)],
                knots=[0, 0, 0, 0, 0.258744787, 0.258744787, 0.258744787, 0.519906858, 0.519906858, 0.519906858, 0.75422633, 0.75422633, 0.75422633, 0.940929049, 0.940929049, 0.940929049, 1, 1, 1, 1], degree=3))
            add(Edge.make_bspline(
                [(1.13974359, -2.69513377), (1.136169754, -2.59050849), (1.120505423, -2.483937307), (1.082652756, -2.386143186), (1.044603899, -2.287842196), (0.98671476, -2.195774251), (0.917191359, -2.115830308), (0.83143774, -2.017223475), (0.727870947, -1.93048768), (0.61293256, -1.866430444), (0.501217868, -1.804169832), (0.376661899, -1.760583309), (0.250098152, -1.738548265), (0.169177452, -1.724459783), (0.086637973, -1.718909751), (0.004452123, -1.717447472)],
                knots=[0, 0, 0, 0, 0.192044482, 0.192044482, 0.192044482, 0.384877418, 0.384877418, 0.384877418, 0.622856126, 0.622856126, 0.622856126, 0.853849591, 0.853849591, 0.853849591, 1, 1, 1, 1], degree=3))
            add(Edge.make_bspline(
                [(0.030274439, -3.598024395), (0.298573697, -3.591863177), (0.570919773, -3.536651882), (1.003008436, -3.218062583), (1.127994918, -2.961046631), (1.13974359, -2.69513377)],
                knots=[0, 0, 0, 0, 0.5, 0.5, 1, 1, 1, 1], degree=3))
            add(Edge.make_bspline(
                [(-1.08275641, -2.65328381), (-1.080255845, -2.755933686), (-1.064947857, -2.860435386), (-1.028329484, -2.956666448), (-0.991574424, -3.053256715), (-0.936196487, -3.144358219), (-0.868885383, -3.223519144), (-0.802139825, -3.30201496), (-0.723848366, -3.373124744), (-0.635864809, -3.427749398), (-0.540657955, -3.486858642), (-0.434210654, -3.530809684), (-0.324977495, -3.557527657), (-0.209271231, -3.585828924), (-0.088905226, -3.595709256), (0.030274439, -3.598024395)],
                knots=[0, 0, 0, 0, 0.192546627, 0.192546627, 0.192546627, 0.385457207, 0.385457207, 0.385457207, 0.576178648, 0.576178648, 0.576178648, 0.782445059, 0.782445059, 0.782445059, 1, 1, 1, 1], degree=3))
        make_face(mode=Mode.SUBTRACT)
        with BuildLine():
            add(Edge.make_bspline(
                [(0.030274439, 0.163129452), (-0.176574569, 0.158842716), (-0.390032776, 0.127065887), (-0.726671431, -0.112992678), (-0.84816771, -0.307402482), (-0.854807692, -0.518935853)],
                knots=[0, 0, 0, 0, 0.5, 0.5, 1, 1, 1, 1], degree=3))
            add(Edge.make_bspline(
                [(0.911794872, -0.5278401), (0.910378196, -0.461413058), (0.899959463, -0.394094746), (0.877901666, -0.331432281), (0.855739467, -0.268473225), (0.820498486, -0.209611521), (0.778994043, -0.157340082), (0.724231937, -0.088371705), (0.655439967, -0.02939478), (0.580836785, 0.017457561), (0.506927182, 0.063874318), (0.425458077, 0.100005398), (0.341342733, 0.123398581), (0.240648007, 0.151402628), (0.134776636, 0.160365623), (0.030274439, 0.163129452)],
                knots=[0, 0, 0, 0, 0.160427029, 0.160427029, 0.160427029, 0.321911318, 0.321911318, 0.321911318, 0.535779581, 0.535779581, 0.535779581, 0.747081473, 0.747081473, 0.747081473, 1, 1, 1, 1], degree=3))
            add(Edge.make_bspline(
                [(0.014246795, -1.261550036), (0.131042531, -1.258899944), (0.250301822, -1.242809941), (0.35950973, -1.201320714), (0.46932602, -1.159600356), (0.572837351, -1.096294942), (0.660664627, -1.018289451), (0.726352616, -0.959947394), (0.78704119, -0.893280481), (0.831209505, -0.817346662), (0.8635483, -0.761750061), (0.888278804, -0.700506224), (0.900975083, -0.637472986), (0.908226779, -0.601470474), (0.910366848, -0.564534058), (0.911794872, -0.5278401)],
                knots=[0, 0, 0, 0, 0.277542706, 0.277542706, 0.277542706, 0.556244576, 0.556244576, 0.556244576, 0.763368873, 0.763368873, 0.763368873, 0.914507238, 0.914507238, 0.914507238, 1, 1, 1, 1], degree=3))
            add(Edge.make_bspline(
                [(-0.854807692, -0.518935853), (-0.851059403, -0.598014432), (-0.837417497, -0.678612401), (-0.806387963, -0.751464013), (-0.775422194, -0.824165914), (-0.7336594, -0.89322838), (-0.683069938, -0.953947492), (-0.624552137, -1.024182453), (-0.551669227, -1.083890883), (-0.472635772, -1.129864493), (-0.378451012, -1.18465159), (-0.273659741, -1.22422906), (-0.166691144, -1.244996806), (-0.107237369, -1.256539642), (-0.046291764, -1.259782899), (0.014246795, -1.261550036)],
                knots=[0, 0, 0, 0, 0.190004067, 0.190004067, 0.190004067, 0.377891327, 0.377891327, 0.377891327, 0.596386864, 0.596386864, 0.596386864, 0.85665725, 0.85665725, 0.85665725, 1, 1, 1, 1], degree=3))
        make_face(mode=Mode.SUBTRACT)
    extrude(amount=CUT_EXTRUDE4_2_DEPTH, mode=Mode.SUBTRACT)

    # Cut-Extrude4 3 outline → Cut-Extrude4 3 (revolve)
    with BuildSketch(Plane(origin=(0, 0, 0), x_dir=(1, 0, 0), z_dir=(0, -0.9238795325112867, 0.38268343236508984))):
        with BuildLine():
            ThreePointArc((0.162359306, 14.600073087), (2.128700501, 14.440766505), (4.054070901, 14.010853599))
            Line((4.054070901, 14.010853599), (4.054070901, 14.600073087))
            Line((4.054070901, 14.600073087), (0.162359306, 14.600073087))
        make_face()
    revolve(axis=Axis((0, 0, 0), (0, 0.38268343236508984, 0.9238795325112867)))

    # Sketch9 → Cut-Extrude5 (cut, two sides: drawn at the far end of the back side and taken through both)
    with BuildSketch(Plane(origin=(-8.561597025, 18.858537854, 16.803080265), x_dir=(-0.947072496207715, -0.23968096505676023, -0.21355730358933597), z_dir=(0.3210197609601124, -0.7071067811865475, -0.6300367553350459)).offset(-CUT_EXTRUDE5_DEPTH_BACK)):
        Circle(SKETCH9_R)
    extrude(amount=CUT_EXTRUDE5_DEPTH + CUT_EXTRUDE5_DEPTH_BACK, mode=Mode.SUBTRACT)


solid = part.part
